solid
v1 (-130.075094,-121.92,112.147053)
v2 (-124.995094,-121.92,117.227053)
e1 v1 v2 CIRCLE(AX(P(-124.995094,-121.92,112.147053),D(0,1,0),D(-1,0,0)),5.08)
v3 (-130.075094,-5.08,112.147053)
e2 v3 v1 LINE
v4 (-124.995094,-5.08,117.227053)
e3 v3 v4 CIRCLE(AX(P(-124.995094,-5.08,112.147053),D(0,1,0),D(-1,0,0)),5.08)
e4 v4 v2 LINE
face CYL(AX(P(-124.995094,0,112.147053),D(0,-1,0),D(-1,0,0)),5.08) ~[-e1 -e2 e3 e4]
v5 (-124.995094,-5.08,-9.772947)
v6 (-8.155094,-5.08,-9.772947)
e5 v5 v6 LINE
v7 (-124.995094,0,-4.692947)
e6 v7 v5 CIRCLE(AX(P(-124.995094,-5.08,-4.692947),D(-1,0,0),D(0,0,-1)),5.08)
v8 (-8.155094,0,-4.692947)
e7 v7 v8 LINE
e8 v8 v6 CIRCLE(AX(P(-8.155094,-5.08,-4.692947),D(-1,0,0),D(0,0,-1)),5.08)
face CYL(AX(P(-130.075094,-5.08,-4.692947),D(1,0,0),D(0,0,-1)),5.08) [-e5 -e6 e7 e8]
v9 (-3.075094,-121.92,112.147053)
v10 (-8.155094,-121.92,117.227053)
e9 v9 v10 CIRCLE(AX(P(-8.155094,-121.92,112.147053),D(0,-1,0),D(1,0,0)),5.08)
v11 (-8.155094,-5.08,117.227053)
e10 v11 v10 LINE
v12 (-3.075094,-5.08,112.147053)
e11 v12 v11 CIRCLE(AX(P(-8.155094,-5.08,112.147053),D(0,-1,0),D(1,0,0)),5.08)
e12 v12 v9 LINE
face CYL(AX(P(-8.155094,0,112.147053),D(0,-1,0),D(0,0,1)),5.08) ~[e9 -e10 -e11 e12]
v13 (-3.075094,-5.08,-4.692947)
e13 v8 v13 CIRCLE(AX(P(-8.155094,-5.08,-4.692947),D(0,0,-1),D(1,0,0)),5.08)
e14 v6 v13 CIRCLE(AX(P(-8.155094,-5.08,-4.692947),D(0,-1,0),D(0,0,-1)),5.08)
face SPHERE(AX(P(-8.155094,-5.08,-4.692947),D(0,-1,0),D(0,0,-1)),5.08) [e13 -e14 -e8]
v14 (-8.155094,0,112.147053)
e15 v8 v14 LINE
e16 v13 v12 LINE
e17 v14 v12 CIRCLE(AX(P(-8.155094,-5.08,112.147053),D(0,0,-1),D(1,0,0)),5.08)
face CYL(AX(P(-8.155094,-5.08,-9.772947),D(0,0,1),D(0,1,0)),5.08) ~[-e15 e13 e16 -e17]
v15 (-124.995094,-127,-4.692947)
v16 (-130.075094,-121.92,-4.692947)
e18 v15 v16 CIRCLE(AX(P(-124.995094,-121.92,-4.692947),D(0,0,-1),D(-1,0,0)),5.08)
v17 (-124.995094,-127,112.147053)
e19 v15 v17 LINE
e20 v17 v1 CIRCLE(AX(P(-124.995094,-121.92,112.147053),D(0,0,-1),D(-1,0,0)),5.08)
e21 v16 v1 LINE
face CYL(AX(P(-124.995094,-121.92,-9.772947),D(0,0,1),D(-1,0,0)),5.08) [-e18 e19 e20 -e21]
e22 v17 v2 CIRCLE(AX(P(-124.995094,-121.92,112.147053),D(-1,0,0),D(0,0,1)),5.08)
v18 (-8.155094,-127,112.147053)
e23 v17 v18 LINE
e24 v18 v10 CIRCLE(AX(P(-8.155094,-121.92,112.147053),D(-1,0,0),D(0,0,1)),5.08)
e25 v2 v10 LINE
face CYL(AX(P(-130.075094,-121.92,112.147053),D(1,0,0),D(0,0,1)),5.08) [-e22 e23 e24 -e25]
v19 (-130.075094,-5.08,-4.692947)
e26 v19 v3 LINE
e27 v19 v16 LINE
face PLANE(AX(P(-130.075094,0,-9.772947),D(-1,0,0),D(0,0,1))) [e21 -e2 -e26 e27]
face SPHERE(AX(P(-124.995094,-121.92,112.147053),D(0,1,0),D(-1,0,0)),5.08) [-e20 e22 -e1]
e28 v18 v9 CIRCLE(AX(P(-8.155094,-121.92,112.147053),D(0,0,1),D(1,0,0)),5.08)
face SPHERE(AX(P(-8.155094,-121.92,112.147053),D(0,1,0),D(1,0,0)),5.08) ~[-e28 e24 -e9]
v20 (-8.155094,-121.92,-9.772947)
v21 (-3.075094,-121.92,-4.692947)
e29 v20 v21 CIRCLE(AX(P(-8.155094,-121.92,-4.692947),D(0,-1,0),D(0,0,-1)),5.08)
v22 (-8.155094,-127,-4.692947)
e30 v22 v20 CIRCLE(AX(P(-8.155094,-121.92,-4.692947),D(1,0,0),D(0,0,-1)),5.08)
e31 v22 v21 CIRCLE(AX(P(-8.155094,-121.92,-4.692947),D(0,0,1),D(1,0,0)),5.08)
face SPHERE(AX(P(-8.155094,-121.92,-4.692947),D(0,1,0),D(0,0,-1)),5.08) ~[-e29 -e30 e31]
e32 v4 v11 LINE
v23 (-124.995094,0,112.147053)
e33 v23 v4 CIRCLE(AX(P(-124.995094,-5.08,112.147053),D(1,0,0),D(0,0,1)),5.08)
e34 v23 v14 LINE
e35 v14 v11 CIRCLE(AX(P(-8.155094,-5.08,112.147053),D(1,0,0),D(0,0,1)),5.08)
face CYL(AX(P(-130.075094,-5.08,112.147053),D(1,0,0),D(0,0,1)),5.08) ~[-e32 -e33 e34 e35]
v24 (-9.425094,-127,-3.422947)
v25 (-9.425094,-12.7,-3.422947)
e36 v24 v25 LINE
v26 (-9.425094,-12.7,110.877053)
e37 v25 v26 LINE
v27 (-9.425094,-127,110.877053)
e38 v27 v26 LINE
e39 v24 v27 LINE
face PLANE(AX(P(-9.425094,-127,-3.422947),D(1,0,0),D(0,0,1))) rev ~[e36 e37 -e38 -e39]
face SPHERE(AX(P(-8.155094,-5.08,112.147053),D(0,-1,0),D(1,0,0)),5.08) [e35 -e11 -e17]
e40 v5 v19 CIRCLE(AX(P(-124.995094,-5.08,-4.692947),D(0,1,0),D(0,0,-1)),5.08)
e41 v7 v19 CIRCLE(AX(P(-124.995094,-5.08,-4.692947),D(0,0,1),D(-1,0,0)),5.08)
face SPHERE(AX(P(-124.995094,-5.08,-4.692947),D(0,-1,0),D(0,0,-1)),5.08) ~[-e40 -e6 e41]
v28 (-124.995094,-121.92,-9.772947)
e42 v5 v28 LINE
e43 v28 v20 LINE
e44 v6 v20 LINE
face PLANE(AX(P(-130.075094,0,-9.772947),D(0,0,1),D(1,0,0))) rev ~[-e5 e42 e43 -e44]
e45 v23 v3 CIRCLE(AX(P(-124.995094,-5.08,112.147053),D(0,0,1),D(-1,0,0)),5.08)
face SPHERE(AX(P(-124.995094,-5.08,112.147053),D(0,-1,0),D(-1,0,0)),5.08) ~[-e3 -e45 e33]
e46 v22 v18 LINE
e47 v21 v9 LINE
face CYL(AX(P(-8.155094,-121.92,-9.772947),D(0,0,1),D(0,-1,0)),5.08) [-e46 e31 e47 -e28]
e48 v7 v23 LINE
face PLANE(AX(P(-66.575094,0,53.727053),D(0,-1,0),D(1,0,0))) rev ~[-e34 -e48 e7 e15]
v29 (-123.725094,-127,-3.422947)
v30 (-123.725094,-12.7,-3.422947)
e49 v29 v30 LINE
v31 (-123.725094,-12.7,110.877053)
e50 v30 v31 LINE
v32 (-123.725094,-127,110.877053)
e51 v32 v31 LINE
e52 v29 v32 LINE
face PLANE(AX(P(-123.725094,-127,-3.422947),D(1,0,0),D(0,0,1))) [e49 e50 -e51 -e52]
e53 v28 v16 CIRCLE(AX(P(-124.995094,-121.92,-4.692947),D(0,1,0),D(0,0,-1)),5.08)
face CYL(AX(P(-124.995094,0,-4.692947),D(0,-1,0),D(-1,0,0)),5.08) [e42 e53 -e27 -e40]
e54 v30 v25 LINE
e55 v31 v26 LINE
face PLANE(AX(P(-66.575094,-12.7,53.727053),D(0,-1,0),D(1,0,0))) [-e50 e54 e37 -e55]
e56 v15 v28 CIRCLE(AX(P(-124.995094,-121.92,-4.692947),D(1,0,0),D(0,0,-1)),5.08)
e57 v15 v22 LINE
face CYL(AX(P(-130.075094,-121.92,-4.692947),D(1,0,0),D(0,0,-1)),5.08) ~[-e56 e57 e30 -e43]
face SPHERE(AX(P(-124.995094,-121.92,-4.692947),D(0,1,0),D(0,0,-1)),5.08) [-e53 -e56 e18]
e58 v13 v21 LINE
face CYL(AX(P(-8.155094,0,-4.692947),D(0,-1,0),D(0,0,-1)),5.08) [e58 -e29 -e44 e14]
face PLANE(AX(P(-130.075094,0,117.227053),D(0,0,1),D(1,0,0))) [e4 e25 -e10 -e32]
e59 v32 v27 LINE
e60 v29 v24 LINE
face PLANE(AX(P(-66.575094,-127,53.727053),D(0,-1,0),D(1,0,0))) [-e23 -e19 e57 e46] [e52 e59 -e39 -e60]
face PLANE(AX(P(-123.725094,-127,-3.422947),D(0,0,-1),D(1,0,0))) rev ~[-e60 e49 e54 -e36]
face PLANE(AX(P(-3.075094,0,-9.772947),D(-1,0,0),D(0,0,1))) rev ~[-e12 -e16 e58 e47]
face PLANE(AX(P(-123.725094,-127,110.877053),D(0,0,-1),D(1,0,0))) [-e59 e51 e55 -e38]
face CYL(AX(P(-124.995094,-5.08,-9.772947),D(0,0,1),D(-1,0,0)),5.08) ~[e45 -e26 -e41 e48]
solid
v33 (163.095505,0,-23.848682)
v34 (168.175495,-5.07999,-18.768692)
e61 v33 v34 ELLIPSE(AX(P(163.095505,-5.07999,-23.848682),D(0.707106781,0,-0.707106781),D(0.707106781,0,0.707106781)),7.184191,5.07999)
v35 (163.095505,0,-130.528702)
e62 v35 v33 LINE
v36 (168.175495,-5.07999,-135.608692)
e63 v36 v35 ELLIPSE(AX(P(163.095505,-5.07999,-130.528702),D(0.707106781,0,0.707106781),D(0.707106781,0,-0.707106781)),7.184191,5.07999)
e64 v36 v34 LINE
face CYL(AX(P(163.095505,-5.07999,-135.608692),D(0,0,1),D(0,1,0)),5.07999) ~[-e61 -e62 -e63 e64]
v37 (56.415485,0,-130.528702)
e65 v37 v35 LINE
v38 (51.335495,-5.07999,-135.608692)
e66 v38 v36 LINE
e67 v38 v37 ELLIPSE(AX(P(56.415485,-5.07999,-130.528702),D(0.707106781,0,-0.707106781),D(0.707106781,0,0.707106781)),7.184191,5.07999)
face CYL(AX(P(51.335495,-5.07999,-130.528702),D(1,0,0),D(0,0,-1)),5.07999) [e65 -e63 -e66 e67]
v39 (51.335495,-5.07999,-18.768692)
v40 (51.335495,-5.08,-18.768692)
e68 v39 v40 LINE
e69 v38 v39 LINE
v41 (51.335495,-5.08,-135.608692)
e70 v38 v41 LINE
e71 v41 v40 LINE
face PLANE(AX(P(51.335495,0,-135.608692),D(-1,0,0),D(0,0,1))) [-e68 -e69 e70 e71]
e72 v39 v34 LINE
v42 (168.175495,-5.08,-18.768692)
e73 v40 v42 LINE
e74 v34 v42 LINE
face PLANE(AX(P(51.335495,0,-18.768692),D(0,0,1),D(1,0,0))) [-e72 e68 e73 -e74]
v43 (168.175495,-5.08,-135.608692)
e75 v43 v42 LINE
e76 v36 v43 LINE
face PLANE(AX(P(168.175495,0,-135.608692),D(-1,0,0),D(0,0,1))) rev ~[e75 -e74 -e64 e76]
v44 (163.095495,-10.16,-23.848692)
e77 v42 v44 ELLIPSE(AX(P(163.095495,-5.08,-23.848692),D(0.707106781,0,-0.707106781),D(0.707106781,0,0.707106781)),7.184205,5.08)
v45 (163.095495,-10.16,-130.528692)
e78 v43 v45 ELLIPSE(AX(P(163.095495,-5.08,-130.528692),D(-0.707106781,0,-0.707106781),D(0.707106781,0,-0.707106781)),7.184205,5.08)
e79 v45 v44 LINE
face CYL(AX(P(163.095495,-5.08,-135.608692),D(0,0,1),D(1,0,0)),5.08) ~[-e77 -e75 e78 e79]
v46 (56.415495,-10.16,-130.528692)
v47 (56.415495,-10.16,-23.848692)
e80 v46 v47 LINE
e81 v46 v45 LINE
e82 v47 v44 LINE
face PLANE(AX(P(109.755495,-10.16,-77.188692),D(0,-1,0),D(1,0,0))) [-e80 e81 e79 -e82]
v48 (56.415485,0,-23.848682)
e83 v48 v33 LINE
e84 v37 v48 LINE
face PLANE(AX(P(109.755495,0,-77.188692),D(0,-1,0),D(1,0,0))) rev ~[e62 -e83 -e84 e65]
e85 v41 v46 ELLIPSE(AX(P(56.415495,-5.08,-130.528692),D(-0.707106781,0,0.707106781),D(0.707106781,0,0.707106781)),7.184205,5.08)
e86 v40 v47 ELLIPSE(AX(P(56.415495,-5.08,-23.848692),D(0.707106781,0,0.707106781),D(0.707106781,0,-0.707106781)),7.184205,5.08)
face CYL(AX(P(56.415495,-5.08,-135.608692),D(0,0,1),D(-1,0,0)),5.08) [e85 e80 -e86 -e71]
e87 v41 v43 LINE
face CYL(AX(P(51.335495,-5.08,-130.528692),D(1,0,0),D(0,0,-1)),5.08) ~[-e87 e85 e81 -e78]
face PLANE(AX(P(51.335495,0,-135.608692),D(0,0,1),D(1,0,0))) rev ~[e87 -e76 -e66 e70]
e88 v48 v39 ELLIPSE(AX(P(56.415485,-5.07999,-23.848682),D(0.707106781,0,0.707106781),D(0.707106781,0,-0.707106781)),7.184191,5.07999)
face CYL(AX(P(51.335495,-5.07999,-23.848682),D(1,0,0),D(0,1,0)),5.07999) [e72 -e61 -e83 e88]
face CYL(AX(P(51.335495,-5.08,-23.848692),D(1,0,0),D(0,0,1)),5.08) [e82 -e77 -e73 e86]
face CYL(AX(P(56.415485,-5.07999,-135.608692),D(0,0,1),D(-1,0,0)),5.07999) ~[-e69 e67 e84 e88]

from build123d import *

# Parameters (mm, degrees)
F0_W     = 127
F0_H     = 127
F1_DEPTH = 127
F0_W_2   = 116.84
F0_H_2   = 116.84
F2_DEPTH = 10.16
F3_R     = 5.08
F4_W     = 114.3
F4_H     = 114.3
F5_DEPTH = 114.3
F6_R     = 5.08
F7_R     = 5.07999


# Not quite as in the source:
# - a fillet or chamfer is up to 0.001 mm smaller than in the source, because OpenCascade refuses the exact size


with BuildPart() as f1:
    # F0 (on Front) → F1 (new body)
    with BuildSketch(Plane.XZ):
        with Locations((-66.5750936817, 53.7270531058)):
            Rectangle(F0_W, F0_H)
    extrude(amount=F1_DEPTH)

    # F4 (on face) → F5 (cut)
    with BuildSketch(Plane.XZ.offset(127)):
        with Locations((-66.5750936817, 53.7270531058)):
            Rectangle(F4_W, F4_H)
    extrude(amount=-F5_DEPTH, mode=Mode.SUBTRACT)

    # F6
    f6_edges = [f1.edges().sort_by_distance(p)[0] for p in [
        (-130.075094, -63.5, -9.772947),
        (-3.075094, -63.5, -9.772947),
        (-66.575094, 0, -9.772947),
        (-66.575094, -127, -9.772947),
        (-130.075094, -63.5, 117.227053),
        (-130.075094, 0, 53.727053),
        (-130.075094, -127, 53.727053),
        (-3.075094, -63.5, 117.227053),
        (-3.075094, 0, 53.727053),
        (-3.075094, -127, 53.727053),
        (-66.575094, 0, 117.227053),
        (-66.575094, -127, 117.227053),
    ]]
    fillet(f6_edges, radius=F6_R)


with BuildPart() as f2:
    # F0 (on Front) → F2 (new body)
    with BuildSketch(Plane.XZ):
        with Locations((109.7554949653, -77.1886917222)):
            Rectangle(F0_W_2, F0_H_2)
    extrude(amount=F2_DEPTH)

    # F3
    f3_edges = [f2.edges().sort_by_distance(p)[0] for p in [
        (109.755495, -10.16, -18.768692),
        (51.335495, -10.16, -77.188692),
        (109.755495, -10.16, -135.608692),
        (168.175495, -10.16, -77.188692),
    ]]
    fillet(f3_edges, radius=F3_R)

    # F7 (radius 5.08 in the source; OpenCascade refuses exactly that, so slightly less here)
    f7_edges = [f2.edges().sort_by_distance(p)[0] for p in [
        (109.755495, 0, -18.768692),
        (51.335495, 0, -77.188692),
        (109.755495, 0, -135.608692),
        (168.175495, 0, -77.188692),
    ]]
    fillet(f7_edges, radius=F7_R)


solid = Compound([f1.part, f2.part])
